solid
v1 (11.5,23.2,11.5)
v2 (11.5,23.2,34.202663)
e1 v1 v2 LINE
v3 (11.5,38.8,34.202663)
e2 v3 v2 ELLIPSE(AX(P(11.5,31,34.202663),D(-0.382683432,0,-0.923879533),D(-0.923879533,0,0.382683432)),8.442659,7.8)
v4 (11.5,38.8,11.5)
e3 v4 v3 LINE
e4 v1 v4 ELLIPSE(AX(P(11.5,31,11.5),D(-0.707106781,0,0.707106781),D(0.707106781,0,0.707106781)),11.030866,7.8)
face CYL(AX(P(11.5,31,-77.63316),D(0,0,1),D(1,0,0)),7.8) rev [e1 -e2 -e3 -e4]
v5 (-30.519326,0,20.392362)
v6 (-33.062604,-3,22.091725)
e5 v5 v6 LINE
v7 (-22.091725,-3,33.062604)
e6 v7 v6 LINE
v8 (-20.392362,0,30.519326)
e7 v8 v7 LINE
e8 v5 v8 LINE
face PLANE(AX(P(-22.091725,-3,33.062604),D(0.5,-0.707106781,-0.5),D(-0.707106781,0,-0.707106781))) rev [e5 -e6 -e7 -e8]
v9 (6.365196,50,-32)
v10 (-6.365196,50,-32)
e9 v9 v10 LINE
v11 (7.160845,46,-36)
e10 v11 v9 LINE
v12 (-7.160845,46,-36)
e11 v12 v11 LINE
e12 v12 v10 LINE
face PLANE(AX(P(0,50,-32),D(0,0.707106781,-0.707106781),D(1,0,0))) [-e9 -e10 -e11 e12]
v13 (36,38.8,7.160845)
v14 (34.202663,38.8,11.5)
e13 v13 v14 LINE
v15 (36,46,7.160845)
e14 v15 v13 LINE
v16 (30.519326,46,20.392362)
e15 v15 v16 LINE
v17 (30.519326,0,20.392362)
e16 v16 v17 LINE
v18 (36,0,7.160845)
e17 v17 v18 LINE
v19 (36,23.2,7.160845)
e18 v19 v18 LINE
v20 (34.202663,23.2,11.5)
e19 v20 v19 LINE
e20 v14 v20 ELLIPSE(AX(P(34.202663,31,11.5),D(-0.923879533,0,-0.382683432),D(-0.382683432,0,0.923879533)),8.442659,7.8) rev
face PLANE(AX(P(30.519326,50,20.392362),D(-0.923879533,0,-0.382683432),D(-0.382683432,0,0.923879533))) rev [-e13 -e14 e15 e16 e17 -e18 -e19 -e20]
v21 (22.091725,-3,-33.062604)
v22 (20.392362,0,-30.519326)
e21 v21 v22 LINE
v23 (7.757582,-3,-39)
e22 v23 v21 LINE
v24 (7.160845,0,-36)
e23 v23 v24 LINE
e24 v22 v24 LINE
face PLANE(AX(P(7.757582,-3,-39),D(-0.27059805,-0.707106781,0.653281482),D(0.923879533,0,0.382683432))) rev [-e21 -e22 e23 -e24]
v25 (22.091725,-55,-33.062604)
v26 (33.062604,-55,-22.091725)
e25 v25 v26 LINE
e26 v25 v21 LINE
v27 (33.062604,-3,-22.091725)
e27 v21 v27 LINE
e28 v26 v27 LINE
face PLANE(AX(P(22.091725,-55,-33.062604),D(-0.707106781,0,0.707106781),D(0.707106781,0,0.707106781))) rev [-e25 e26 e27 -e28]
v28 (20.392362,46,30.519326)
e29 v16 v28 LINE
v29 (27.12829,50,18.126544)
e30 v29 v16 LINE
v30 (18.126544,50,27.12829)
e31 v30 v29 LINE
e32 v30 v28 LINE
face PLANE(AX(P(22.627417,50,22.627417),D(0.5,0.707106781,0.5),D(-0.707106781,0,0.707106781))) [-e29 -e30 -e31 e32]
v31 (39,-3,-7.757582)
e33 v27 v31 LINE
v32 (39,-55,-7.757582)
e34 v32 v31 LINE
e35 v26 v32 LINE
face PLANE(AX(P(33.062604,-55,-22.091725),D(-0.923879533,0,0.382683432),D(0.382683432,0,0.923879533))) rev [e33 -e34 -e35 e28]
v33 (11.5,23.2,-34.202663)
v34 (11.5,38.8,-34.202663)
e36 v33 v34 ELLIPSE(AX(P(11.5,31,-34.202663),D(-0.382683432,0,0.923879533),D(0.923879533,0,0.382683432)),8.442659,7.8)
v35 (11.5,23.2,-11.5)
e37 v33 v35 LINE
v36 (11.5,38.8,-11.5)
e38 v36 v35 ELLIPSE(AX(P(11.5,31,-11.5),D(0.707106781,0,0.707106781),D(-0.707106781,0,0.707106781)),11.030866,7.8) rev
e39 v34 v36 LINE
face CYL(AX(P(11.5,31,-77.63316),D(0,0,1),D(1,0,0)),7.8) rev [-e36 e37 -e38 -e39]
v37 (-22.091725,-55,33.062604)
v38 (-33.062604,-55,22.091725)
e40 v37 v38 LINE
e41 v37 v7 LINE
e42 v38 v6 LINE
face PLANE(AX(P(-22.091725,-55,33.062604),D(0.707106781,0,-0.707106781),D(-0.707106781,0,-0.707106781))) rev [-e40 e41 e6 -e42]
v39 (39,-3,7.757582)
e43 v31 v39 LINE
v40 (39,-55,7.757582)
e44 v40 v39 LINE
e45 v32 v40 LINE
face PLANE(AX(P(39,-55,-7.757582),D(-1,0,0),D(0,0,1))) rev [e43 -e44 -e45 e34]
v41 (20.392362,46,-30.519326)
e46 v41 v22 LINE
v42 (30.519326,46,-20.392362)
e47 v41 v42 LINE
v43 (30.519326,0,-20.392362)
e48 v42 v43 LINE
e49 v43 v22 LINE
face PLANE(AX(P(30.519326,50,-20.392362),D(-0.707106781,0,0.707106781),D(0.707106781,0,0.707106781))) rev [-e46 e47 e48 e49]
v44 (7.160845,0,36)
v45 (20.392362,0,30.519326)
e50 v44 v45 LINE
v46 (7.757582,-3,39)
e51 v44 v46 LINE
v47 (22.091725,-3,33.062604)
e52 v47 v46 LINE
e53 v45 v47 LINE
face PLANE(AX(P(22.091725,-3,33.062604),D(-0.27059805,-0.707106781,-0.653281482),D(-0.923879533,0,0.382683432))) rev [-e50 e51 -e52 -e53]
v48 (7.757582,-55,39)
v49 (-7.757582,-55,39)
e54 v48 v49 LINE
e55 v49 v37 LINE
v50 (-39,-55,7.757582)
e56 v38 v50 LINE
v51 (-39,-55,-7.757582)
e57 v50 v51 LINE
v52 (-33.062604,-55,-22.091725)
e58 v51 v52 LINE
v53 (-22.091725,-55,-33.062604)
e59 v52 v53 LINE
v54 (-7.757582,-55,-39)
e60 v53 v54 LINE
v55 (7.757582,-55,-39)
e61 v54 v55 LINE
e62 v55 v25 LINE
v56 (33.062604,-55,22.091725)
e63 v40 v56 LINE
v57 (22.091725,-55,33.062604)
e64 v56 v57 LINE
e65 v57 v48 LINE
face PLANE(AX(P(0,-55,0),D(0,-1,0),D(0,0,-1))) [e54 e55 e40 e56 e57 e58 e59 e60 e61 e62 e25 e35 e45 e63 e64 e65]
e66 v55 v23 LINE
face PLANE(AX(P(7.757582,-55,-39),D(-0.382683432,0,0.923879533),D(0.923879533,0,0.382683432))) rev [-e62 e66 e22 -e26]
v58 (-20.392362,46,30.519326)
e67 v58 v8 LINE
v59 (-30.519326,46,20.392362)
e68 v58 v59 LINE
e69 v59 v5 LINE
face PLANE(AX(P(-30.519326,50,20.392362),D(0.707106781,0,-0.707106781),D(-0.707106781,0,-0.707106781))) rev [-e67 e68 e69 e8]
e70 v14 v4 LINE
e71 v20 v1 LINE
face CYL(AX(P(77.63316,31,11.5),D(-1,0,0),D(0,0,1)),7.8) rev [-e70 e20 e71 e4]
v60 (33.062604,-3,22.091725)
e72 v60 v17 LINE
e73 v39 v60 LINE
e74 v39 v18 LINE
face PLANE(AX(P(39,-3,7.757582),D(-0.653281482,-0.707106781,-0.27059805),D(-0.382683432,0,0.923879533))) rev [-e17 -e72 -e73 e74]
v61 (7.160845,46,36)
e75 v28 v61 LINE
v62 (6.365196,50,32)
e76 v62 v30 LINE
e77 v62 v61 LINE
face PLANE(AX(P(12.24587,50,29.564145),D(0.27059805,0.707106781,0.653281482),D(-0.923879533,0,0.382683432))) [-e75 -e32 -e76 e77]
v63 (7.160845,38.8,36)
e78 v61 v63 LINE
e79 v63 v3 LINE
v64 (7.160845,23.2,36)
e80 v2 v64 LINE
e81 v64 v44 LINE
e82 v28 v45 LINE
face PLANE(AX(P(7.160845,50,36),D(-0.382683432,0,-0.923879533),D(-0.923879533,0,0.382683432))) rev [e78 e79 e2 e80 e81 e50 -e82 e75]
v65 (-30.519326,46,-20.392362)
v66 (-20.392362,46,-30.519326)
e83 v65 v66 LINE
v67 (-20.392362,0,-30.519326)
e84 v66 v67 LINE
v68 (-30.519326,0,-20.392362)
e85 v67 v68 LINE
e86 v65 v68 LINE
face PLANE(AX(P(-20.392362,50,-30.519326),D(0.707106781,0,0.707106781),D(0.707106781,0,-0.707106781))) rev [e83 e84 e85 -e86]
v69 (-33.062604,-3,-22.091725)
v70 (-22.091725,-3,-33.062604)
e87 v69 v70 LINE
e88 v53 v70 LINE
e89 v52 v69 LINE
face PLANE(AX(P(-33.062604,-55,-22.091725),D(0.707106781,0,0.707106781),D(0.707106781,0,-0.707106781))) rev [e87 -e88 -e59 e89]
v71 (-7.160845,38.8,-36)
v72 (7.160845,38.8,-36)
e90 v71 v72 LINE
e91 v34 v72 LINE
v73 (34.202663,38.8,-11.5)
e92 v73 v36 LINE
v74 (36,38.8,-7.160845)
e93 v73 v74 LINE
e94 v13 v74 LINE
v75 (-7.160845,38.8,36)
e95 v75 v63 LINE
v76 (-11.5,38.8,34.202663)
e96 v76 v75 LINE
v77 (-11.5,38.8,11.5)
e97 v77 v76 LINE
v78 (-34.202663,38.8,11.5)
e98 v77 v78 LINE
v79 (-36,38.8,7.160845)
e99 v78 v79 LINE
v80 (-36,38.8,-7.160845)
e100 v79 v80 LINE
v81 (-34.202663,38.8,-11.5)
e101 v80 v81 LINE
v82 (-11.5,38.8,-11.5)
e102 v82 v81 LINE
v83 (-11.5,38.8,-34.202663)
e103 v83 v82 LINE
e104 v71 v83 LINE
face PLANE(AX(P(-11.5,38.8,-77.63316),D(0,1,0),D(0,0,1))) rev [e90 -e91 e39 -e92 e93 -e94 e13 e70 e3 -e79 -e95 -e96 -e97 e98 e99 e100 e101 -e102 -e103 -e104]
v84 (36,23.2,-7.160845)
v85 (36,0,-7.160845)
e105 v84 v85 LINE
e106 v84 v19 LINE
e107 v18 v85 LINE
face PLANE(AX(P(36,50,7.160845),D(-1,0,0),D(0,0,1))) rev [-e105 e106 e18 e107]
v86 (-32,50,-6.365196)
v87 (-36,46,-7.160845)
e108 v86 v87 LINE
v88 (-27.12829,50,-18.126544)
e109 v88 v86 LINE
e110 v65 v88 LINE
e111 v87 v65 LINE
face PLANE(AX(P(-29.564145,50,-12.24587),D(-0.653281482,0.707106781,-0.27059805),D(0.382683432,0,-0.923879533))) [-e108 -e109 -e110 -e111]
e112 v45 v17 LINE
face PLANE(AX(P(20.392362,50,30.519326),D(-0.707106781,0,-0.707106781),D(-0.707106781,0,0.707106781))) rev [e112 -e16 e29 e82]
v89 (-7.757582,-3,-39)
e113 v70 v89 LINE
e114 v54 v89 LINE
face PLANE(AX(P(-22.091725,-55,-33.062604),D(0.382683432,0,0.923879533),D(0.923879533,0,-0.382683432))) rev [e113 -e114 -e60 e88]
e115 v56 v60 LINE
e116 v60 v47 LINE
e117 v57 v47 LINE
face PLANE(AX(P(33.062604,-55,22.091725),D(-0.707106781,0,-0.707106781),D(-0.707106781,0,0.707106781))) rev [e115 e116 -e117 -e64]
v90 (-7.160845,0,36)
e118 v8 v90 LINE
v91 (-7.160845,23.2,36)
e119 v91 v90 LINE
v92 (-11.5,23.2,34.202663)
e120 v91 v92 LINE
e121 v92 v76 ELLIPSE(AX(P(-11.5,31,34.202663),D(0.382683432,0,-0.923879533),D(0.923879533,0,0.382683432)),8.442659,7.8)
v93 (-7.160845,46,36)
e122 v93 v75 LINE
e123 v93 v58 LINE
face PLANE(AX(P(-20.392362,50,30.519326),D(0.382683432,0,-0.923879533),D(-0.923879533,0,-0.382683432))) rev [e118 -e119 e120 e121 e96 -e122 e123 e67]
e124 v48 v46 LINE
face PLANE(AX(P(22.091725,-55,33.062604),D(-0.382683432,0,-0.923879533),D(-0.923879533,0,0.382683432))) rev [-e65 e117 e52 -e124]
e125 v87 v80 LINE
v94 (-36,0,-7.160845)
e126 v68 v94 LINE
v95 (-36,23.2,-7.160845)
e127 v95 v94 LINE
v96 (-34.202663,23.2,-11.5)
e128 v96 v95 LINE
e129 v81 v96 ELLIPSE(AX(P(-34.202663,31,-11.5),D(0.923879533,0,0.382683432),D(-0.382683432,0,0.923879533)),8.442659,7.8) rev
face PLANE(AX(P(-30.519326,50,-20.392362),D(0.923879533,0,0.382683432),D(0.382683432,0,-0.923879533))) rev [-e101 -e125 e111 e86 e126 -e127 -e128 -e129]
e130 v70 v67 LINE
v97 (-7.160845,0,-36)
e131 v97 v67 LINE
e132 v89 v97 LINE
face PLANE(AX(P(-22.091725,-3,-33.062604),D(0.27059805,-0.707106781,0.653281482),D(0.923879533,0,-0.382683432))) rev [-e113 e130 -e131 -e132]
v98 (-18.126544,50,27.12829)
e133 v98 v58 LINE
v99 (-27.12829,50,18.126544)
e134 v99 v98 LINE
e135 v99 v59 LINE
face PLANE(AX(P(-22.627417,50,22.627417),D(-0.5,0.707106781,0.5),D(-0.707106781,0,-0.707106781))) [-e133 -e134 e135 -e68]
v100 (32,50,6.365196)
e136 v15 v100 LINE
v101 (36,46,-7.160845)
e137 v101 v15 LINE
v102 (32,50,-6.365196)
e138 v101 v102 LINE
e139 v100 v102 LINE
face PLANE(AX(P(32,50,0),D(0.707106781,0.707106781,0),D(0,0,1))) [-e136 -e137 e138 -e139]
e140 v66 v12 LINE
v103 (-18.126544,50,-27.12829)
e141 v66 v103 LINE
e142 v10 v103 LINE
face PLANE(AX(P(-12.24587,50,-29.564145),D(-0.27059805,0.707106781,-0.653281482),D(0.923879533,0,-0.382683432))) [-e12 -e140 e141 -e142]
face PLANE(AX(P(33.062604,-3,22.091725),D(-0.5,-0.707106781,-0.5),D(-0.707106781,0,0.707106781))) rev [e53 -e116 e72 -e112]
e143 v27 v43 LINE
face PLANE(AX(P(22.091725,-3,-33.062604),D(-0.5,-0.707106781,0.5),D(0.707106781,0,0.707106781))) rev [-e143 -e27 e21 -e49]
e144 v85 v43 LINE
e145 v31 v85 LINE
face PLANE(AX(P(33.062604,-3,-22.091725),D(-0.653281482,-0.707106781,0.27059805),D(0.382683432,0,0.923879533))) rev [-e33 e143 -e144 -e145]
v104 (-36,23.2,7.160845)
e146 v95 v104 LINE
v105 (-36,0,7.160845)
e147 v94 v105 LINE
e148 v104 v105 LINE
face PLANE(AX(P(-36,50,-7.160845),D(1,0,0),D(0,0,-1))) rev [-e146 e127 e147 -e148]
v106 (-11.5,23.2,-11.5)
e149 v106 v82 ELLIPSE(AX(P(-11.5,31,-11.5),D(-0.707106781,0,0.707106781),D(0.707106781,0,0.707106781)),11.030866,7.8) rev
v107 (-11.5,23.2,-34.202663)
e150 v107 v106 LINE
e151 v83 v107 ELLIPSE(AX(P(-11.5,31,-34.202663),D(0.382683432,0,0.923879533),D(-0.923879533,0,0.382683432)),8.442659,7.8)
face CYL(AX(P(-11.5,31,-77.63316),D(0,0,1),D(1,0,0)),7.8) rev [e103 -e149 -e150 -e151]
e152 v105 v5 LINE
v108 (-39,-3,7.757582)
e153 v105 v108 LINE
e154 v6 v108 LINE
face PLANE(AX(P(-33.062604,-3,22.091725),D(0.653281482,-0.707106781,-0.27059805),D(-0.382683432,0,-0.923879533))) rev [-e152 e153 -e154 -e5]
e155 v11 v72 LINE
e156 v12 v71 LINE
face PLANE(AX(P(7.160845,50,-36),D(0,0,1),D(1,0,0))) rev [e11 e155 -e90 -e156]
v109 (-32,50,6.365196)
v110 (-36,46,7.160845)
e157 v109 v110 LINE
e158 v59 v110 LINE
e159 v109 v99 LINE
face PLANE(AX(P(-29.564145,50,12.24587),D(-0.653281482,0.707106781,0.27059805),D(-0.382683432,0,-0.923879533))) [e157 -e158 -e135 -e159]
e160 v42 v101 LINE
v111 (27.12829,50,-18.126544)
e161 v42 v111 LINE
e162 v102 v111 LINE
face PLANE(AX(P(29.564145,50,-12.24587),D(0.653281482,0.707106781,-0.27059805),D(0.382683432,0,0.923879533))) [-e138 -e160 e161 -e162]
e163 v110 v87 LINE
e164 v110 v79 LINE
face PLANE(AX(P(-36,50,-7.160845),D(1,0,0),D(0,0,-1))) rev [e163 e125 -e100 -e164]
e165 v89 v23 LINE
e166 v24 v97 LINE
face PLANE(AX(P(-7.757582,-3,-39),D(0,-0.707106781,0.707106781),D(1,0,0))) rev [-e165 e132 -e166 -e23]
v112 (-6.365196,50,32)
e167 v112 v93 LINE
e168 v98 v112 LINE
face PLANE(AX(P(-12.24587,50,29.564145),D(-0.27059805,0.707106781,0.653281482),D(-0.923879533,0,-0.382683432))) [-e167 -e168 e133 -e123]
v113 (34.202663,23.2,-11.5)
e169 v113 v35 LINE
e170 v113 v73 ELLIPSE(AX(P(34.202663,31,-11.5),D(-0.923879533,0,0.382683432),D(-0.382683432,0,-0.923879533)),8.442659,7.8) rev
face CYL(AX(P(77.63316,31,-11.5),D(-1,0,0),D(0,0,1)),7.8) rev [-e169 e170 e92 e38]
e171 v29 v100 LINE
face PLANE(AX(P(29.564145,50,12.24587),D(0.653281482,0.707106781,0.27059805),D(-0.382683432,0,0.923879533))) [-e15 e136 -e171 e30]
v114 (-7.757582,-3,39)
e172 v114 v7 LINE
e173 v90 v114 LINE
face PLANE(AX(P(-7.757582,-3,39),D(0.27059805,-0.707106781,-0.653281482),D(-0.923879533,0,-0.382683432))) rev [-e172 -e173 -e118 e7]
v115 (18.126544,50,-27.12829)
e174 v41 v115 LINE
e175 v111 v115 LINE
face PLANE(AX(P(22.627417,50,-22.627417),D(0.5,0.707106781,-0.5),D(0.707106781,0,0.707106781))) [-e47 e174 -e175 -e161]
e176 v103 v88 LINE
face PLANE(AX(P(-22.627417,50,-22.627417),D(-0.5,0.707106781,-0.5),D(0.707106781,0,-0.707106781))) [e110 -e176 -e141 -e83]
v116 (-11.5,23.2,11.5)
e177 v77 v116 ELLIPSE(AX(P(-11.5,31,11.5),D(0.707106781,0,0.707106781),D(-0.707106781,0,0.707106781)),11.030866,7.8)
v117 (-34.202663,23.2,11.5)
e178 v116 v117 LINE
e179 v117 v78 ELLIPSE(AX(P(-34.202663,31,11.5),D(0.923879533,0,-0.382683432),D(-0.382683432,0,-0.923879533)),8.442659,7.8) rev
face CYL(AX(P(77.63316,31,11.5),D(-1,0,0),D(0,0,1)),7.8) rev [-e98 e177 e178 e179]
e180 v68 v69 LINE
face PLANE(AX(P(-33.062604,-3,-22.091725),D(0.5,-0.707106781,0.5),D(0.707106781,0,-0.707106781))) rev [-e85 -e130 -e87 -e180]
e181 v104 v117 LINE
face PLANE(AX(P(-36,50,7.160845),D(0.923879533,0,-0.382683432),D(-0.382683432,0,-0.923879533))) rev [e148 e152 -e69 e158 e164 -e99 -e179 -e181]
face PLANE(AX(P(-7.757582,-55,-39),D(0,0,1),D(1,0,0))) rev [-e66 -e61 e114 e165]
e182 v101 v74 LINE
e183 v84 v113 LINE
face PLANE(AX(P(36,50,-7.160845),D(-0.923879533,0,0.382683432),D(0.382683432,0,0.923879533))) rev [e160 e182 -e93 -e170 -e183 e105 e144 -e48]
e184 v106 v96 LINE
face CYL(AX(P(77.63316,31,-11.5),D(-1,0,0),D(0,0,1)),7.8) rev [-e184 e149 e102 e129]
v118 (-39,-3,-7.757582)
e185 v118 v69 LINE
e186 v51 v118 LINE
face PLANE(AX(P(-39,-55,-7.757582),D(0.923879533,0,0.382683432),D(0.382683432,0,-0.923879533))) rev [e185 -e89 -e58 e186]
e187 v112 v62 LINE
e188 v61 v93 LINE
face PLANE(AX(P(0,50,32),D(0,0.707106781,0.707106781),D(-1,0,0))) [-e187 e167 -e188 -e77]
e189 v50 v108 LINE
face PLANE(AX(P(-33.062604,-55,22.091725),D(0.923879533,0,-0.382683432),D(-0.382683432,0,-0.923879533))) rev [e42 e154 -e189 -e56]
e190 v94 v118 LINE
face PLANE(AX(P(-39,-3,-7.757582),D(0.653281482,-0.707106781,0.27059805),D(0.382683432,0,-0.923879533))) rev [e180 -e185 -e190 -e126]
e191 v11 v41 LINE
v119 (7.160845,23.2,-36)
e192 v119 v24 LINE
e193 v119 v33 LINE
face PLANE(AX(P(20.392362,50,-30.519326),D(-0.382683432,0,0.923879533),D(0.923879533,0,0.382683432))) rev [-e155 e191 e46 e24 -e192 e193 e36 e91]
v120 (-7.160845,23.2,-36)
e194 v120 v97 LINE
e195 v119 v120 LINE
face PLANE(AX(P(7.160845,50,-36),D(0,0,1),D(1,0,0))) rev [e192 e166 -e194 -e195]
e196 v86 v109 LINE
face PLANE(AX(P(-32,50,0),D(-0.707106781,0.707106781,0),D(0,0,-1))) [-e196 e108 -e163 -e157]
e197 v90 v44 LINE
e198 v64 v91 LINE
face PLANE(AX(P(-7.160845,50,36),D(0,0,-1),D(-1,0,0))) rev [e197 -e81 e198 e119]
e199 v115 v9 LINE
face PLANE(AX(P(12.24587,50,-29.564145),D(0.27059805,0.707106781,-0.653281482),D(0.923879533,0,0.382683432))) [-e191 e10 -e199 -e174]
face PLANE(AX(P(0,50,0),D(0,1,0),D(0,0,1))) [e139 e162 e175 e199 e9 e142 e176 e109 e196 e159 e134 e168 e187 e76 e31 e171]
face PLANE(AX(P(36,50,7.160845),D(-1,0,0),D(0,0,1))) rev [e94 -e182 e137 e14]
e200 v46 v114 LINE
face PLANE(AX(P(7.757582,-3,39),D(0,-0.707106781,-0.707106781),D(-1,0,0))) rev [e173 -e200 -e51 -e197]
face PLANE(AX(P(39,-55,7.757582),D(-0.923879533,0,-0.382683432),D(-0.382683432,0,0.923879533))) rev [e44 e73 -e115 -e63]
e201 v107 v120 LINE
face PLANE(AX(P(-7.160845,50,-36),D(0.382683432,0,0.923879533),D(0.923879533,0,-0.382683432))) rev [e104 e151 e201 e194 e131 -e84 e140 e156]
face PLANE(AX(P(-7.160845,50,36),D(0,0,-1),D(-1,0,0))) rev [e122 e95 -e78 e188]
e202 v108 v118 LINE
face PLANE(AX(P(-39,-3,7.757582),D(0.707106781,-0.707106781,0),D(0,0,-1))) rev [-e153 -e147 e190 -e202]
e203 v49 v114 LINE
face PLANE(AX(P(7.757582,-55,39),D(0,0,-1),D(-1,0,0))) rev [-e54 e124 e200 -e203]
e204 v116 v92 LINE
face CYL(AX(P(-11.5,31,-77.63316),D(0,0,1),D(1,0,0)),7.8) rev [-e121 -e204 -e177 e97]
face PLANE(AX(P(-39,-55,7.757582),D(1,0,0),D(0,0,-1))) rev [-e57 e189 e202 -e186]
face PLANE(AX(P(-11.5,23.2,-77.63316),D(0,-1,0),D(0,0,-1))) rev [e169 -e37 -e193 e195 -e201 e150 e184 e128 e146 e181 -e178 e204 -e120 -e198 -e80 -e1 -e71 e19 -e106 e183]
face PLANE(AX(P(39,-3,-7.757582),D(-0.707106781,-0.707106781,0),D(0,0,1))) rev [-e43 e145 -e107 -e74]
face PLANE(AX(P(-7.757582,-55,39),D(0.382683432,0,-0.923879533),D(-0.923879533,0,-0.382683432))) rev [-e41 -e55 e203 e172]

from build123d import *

# Parameters (mm, degrees)
BOSS_EXTRUDE1_DEPTH            = 50
BOSS_EXTRUDE2_DEPTH            = 55
CHAMFER1_SIZE                  = 4
CHAMFER3_SIZE                  = 3
CUT_EXTRUDE1_REACH             = 79.891
CUT_EXTRUDE1_DIRECTION_2_REACH = 79.891
CUT_EXTRUDE2_REACH             = 79.891
CUT_EXTRUDE2_DIRECTION_2_REACH = 79.891


with BuildPart() as part:
    # Sketch1 → Boss-Extrude1 (new body)
    with BuildSketch(Plane(origin=(0, 0, 0), x_dir=(1, 0, 0), z_dir=(0, 1, 0))):
        Polygon((36, 7.160845226), (30.519326341, 20.392361905), (20.392361905, 30.519326341), (7.160845226, 36), (-7.160845226, 36), (-20.392361905, 30.519326341), (-30.519326341, 20.392361905), (-36, 7.160845226), (-36, -7.160845226), (-30.519326341, -20.392361905), (-20.392361905, -30.519326341), (-7.160845226, -36), (7.160845226, -36), (20.392361905, -30.519326341), (30.519326341, -20.392361905), (36, -7.160845226), align=None)
    extrude(amount=BOSS_EXTRUDE1_DEPTH)

    # Sketch2 → Boss-Extrude2 (add)
    with BuildSketch(Plane.XZ):
        Polygon((33.062603536, 22.091725397), (22.091725397, 33.062603536), (7.757582328, 39), (-7.757582328, 39), (-22.091725397, 33.062603536), (-33.062603536, 22.091725397), (-39, 7.757582328), (-39, -7.757582328), (-33.062603536, -22.091725397), (-22.091725397, -33.062603536), (-7.757582328, -39), (7.757582328, -39), (22.091725397, -33.062603536), (33.062603536, -22.091725397), (39, -7.757582328), (39, 7.757582328), align=None)
    extrude(amount=BOSS_EXTRUDE2_DEPTH)

    # Chamfer1
    chamfer1_edges = [part.edges().sort_by_distance(p)[0] for p in [
        (25.455844123, 50, -25.455844123),
        (13.776603565, 50, -33.25966317),
        (0, 50, -36),
        (-13.776603565, 50, -33.25966317),
        (-25.455844123, 50, -25.455844123),
        (-33.25966317, 50, -13.776603565),
        (-36, 50, 0),
        (-33.25966317, 50, 13.776603565),
        (-25.455844123, 50, 25.455844123),
        (-13.776603565, 50, 33.25966317),
        (36, 50, 0),
        (0, 50, 36),
        (13.776603565, 50, 33.25966317),
        (25.455844123, 50, 25.455844123),
        (33.25966317, 50, 13.776603565),
        (33.25966317, 50, -13.776603565),
    ]]
    chamfer(chamfer1_edges, length=CHAMFER1_SIZE)

    # Chamfer3
    chamfer3_edges = [part.edges().sort_by_distance(p)[0] for p in [
        (36.031301768, 0, 14.924653862),
        (27.577164466, 0, 27.577164466),
        (14.924653862, 0, 36.031301768),
        (0, 0, 39),
        (-14.924653862, 0, 36.031301768),
        (-27.577164466, 0, 27.577164466),
        (-36.031301768, 0, 14.924653862),
        (-39, 0, 0),
        (-36.031301768, 0, -14.924653862),
        (-27.577164466, 0, -27.577164466),
        (-14.924653862, 0, -36.031301768),
        (0, 0, -39),
        (14.924653862, 0, -36.031301768),
        (27.577164466, 0, -27.577164466),
        (36.031301768, 0, -14.924653862),
        (39, 0, 0),
    ]]
    chamfer(chamfer3_edges, length=CHAMFER3_SIZE - 0.0001)  # a hair under: the kernel refuses the full size

    # Cut-Extrude1: up to this face of the body (flat: up to its plane)
    cut_extrude1_end = Plane(part.part.faces().sort_by_distance((0, 23, -36))[0])
    # Sketch3 → Cut-Extrude1 (cut, up to the picked face)
    with BuildSketch(Plane.XY, mode=Mode.PRIVATE) as cut_extrude1_sk1:
        with BuildLine():
            Line((-11.5, 38.8), (11.5, 38.8))
            ThreePointArc((11.5, 38.8), (19.3, 31), (11.5, 23.2))
            Line((11.5, 23.2), (-11.5, 23.2))
            ThreePointArc((-11.5, 23.2), (-19.3, 31), (-11.5, 38.8))
        make_face()
    cut_extrude1_tool1 = split(extrude(cut_extrude1_sk1.sketch, amount=-CUT_EXTRUDE1_REACH, mode=Mode.PRIVATE), bisect_by=cut_extrude1_end, keep=Keep.BOTH, mode=Mode.PRIVATE)
    add(cut_extrude1_tool1.solids().sort_by(Axis((0, 31, 0), (0, 0, -1)))[0], mode=Mode.SUBTRACT)

    # Cut-Extrude1 direction 2: up to this face of the body (flat: up to its plane)
    cut_extrude1_direction_2_end = Plane(part.part.faces().sort_by_distance((0, 23, 36))[0])
    # Sketch3 → Cut-Extrude1 direction 2 (cut, up to the picked face)
    with BuildSketch(Plane.XY, mode=Mode.PRIVATE) as cut_extrude1_direction_2_sk1:
        with BuildLine():
            Line((-11.5, 38.8), (11.5, 38.8))
            ThreePointArc((11.5, 38.8), (19.3, 31), (11.5, 23.2))
            Line((11.5, 23.2), (-11.5, 23.2))
            ThreePointArc((-11.5, 23.2), (-19.3, 31), (-11.5, 38.8))
        make_face()
    cut_extrude1_direction_2_tool1 = split(extrude(cut_extrude1_direction_2_sk1.sketch, amount=CUT_EXTRUDE1_DIRECTION_2_REACH, mode=Mode.PRIVATE), bisect_by=cut_extrude1_direction_2_end, keep=Keep.BOTH, mode=Mode.PRIVATE)
    add(cut_extrude1_direction_2_tool1.solids().sort_by(Axis((0, 31, 0), (0, 0, 1)))[0], mode=Mode.SUBTRACT)

    # Cut-Extrude2: up to this face of the body (flat: up to its plane)
    cut_extrude2_end = Plane(part.part.faces().sort_by_distance((36, 23, 0))[0])
    # Sketch4 → Cut-Extrude2 (cut, up to the picked face)
    with BuildSketch(Plane(origin=(0, 0, 0), x_dir=(0, 0, -1), z_dir=(1, 0, 0)), mode=Mode.PRIVATE) as cut_extrude2_sk1:
        with BuildLine():
            Line((-11.5, 38.8), (11.5, 38.8))
            ThreePointArc((11.5, 38.8), (19.3, 31), (11.5, 23.2))
            Line((11.5, 23.2), (-11.5, 23.2))
            ThreePointArc((-11.5, 23.2), (-19.3, 31), (-11.5, 38.8))
        make_face()
    cut_extrude2_tool1 = split(extrude(cut_extrude2_sk1.sketch, amount=CUT_EXTRUDE2_REACH, mode=Mode.PRIVATE), bisect_by=cut_extrude2_end, keep=Keep.BOTH, mode=Mode.PRIVATE)
    add(cut_extrude2_tool1.solids().sort_by(Axis((0, 31, 0), (1, 0, 0)))[0], mode=Mode.SUBTRACT)

    # Cut-Extrude2 direction 2: up to this face of the body (flat: up to its plane)
    cut_extrude2_direction_2_end = Plane(part.part.faces().sort_by_distance((-36, 23, 0))[0])
    # Sketch4 → Cut-Extrude2 direction 2 (cut, up to the picked face)
    with BuildSketch(Plane(origin=(0, 0, 0), x_dir=(0, 0, -1), z_dir=(1, 0, 0)), mode=Mode.PRIVATE) as cut_extrude2_direction_2_sk1:
        with BuildLine():
            Line((-11.5, 38.8), (11.5, 38.8))
            ThreePointArc((11.5, 38.8), (19.3, 31), (11.5, 23.2))
            Line((11.5, 23.2), (-11.5, 23.2))
            ThreePointArc((-11.5, 23.2), (-19.3, 31), (-11.5, 38.8))
        make_face()
    cut_extrude2_direction_2_tool1 = split(extrude(cut_extrude2_direction_2_sk1.sketch, amount=-CUT_EXTRUDE2_DIRECTION_2_REACH, mode=Mode.PRIVATE), bisect_by=cut_extrude2_direction_2_end, keep=Keep.BOTH, mode=Mode.PRIVATE)
    add(cut_extrude2_direction_2_tool1.solids().sort_by(Axis((0, 31, 0), (-1, 0, 0)))[0], mode=Mode.SUBTRACT)


solid = part.part
